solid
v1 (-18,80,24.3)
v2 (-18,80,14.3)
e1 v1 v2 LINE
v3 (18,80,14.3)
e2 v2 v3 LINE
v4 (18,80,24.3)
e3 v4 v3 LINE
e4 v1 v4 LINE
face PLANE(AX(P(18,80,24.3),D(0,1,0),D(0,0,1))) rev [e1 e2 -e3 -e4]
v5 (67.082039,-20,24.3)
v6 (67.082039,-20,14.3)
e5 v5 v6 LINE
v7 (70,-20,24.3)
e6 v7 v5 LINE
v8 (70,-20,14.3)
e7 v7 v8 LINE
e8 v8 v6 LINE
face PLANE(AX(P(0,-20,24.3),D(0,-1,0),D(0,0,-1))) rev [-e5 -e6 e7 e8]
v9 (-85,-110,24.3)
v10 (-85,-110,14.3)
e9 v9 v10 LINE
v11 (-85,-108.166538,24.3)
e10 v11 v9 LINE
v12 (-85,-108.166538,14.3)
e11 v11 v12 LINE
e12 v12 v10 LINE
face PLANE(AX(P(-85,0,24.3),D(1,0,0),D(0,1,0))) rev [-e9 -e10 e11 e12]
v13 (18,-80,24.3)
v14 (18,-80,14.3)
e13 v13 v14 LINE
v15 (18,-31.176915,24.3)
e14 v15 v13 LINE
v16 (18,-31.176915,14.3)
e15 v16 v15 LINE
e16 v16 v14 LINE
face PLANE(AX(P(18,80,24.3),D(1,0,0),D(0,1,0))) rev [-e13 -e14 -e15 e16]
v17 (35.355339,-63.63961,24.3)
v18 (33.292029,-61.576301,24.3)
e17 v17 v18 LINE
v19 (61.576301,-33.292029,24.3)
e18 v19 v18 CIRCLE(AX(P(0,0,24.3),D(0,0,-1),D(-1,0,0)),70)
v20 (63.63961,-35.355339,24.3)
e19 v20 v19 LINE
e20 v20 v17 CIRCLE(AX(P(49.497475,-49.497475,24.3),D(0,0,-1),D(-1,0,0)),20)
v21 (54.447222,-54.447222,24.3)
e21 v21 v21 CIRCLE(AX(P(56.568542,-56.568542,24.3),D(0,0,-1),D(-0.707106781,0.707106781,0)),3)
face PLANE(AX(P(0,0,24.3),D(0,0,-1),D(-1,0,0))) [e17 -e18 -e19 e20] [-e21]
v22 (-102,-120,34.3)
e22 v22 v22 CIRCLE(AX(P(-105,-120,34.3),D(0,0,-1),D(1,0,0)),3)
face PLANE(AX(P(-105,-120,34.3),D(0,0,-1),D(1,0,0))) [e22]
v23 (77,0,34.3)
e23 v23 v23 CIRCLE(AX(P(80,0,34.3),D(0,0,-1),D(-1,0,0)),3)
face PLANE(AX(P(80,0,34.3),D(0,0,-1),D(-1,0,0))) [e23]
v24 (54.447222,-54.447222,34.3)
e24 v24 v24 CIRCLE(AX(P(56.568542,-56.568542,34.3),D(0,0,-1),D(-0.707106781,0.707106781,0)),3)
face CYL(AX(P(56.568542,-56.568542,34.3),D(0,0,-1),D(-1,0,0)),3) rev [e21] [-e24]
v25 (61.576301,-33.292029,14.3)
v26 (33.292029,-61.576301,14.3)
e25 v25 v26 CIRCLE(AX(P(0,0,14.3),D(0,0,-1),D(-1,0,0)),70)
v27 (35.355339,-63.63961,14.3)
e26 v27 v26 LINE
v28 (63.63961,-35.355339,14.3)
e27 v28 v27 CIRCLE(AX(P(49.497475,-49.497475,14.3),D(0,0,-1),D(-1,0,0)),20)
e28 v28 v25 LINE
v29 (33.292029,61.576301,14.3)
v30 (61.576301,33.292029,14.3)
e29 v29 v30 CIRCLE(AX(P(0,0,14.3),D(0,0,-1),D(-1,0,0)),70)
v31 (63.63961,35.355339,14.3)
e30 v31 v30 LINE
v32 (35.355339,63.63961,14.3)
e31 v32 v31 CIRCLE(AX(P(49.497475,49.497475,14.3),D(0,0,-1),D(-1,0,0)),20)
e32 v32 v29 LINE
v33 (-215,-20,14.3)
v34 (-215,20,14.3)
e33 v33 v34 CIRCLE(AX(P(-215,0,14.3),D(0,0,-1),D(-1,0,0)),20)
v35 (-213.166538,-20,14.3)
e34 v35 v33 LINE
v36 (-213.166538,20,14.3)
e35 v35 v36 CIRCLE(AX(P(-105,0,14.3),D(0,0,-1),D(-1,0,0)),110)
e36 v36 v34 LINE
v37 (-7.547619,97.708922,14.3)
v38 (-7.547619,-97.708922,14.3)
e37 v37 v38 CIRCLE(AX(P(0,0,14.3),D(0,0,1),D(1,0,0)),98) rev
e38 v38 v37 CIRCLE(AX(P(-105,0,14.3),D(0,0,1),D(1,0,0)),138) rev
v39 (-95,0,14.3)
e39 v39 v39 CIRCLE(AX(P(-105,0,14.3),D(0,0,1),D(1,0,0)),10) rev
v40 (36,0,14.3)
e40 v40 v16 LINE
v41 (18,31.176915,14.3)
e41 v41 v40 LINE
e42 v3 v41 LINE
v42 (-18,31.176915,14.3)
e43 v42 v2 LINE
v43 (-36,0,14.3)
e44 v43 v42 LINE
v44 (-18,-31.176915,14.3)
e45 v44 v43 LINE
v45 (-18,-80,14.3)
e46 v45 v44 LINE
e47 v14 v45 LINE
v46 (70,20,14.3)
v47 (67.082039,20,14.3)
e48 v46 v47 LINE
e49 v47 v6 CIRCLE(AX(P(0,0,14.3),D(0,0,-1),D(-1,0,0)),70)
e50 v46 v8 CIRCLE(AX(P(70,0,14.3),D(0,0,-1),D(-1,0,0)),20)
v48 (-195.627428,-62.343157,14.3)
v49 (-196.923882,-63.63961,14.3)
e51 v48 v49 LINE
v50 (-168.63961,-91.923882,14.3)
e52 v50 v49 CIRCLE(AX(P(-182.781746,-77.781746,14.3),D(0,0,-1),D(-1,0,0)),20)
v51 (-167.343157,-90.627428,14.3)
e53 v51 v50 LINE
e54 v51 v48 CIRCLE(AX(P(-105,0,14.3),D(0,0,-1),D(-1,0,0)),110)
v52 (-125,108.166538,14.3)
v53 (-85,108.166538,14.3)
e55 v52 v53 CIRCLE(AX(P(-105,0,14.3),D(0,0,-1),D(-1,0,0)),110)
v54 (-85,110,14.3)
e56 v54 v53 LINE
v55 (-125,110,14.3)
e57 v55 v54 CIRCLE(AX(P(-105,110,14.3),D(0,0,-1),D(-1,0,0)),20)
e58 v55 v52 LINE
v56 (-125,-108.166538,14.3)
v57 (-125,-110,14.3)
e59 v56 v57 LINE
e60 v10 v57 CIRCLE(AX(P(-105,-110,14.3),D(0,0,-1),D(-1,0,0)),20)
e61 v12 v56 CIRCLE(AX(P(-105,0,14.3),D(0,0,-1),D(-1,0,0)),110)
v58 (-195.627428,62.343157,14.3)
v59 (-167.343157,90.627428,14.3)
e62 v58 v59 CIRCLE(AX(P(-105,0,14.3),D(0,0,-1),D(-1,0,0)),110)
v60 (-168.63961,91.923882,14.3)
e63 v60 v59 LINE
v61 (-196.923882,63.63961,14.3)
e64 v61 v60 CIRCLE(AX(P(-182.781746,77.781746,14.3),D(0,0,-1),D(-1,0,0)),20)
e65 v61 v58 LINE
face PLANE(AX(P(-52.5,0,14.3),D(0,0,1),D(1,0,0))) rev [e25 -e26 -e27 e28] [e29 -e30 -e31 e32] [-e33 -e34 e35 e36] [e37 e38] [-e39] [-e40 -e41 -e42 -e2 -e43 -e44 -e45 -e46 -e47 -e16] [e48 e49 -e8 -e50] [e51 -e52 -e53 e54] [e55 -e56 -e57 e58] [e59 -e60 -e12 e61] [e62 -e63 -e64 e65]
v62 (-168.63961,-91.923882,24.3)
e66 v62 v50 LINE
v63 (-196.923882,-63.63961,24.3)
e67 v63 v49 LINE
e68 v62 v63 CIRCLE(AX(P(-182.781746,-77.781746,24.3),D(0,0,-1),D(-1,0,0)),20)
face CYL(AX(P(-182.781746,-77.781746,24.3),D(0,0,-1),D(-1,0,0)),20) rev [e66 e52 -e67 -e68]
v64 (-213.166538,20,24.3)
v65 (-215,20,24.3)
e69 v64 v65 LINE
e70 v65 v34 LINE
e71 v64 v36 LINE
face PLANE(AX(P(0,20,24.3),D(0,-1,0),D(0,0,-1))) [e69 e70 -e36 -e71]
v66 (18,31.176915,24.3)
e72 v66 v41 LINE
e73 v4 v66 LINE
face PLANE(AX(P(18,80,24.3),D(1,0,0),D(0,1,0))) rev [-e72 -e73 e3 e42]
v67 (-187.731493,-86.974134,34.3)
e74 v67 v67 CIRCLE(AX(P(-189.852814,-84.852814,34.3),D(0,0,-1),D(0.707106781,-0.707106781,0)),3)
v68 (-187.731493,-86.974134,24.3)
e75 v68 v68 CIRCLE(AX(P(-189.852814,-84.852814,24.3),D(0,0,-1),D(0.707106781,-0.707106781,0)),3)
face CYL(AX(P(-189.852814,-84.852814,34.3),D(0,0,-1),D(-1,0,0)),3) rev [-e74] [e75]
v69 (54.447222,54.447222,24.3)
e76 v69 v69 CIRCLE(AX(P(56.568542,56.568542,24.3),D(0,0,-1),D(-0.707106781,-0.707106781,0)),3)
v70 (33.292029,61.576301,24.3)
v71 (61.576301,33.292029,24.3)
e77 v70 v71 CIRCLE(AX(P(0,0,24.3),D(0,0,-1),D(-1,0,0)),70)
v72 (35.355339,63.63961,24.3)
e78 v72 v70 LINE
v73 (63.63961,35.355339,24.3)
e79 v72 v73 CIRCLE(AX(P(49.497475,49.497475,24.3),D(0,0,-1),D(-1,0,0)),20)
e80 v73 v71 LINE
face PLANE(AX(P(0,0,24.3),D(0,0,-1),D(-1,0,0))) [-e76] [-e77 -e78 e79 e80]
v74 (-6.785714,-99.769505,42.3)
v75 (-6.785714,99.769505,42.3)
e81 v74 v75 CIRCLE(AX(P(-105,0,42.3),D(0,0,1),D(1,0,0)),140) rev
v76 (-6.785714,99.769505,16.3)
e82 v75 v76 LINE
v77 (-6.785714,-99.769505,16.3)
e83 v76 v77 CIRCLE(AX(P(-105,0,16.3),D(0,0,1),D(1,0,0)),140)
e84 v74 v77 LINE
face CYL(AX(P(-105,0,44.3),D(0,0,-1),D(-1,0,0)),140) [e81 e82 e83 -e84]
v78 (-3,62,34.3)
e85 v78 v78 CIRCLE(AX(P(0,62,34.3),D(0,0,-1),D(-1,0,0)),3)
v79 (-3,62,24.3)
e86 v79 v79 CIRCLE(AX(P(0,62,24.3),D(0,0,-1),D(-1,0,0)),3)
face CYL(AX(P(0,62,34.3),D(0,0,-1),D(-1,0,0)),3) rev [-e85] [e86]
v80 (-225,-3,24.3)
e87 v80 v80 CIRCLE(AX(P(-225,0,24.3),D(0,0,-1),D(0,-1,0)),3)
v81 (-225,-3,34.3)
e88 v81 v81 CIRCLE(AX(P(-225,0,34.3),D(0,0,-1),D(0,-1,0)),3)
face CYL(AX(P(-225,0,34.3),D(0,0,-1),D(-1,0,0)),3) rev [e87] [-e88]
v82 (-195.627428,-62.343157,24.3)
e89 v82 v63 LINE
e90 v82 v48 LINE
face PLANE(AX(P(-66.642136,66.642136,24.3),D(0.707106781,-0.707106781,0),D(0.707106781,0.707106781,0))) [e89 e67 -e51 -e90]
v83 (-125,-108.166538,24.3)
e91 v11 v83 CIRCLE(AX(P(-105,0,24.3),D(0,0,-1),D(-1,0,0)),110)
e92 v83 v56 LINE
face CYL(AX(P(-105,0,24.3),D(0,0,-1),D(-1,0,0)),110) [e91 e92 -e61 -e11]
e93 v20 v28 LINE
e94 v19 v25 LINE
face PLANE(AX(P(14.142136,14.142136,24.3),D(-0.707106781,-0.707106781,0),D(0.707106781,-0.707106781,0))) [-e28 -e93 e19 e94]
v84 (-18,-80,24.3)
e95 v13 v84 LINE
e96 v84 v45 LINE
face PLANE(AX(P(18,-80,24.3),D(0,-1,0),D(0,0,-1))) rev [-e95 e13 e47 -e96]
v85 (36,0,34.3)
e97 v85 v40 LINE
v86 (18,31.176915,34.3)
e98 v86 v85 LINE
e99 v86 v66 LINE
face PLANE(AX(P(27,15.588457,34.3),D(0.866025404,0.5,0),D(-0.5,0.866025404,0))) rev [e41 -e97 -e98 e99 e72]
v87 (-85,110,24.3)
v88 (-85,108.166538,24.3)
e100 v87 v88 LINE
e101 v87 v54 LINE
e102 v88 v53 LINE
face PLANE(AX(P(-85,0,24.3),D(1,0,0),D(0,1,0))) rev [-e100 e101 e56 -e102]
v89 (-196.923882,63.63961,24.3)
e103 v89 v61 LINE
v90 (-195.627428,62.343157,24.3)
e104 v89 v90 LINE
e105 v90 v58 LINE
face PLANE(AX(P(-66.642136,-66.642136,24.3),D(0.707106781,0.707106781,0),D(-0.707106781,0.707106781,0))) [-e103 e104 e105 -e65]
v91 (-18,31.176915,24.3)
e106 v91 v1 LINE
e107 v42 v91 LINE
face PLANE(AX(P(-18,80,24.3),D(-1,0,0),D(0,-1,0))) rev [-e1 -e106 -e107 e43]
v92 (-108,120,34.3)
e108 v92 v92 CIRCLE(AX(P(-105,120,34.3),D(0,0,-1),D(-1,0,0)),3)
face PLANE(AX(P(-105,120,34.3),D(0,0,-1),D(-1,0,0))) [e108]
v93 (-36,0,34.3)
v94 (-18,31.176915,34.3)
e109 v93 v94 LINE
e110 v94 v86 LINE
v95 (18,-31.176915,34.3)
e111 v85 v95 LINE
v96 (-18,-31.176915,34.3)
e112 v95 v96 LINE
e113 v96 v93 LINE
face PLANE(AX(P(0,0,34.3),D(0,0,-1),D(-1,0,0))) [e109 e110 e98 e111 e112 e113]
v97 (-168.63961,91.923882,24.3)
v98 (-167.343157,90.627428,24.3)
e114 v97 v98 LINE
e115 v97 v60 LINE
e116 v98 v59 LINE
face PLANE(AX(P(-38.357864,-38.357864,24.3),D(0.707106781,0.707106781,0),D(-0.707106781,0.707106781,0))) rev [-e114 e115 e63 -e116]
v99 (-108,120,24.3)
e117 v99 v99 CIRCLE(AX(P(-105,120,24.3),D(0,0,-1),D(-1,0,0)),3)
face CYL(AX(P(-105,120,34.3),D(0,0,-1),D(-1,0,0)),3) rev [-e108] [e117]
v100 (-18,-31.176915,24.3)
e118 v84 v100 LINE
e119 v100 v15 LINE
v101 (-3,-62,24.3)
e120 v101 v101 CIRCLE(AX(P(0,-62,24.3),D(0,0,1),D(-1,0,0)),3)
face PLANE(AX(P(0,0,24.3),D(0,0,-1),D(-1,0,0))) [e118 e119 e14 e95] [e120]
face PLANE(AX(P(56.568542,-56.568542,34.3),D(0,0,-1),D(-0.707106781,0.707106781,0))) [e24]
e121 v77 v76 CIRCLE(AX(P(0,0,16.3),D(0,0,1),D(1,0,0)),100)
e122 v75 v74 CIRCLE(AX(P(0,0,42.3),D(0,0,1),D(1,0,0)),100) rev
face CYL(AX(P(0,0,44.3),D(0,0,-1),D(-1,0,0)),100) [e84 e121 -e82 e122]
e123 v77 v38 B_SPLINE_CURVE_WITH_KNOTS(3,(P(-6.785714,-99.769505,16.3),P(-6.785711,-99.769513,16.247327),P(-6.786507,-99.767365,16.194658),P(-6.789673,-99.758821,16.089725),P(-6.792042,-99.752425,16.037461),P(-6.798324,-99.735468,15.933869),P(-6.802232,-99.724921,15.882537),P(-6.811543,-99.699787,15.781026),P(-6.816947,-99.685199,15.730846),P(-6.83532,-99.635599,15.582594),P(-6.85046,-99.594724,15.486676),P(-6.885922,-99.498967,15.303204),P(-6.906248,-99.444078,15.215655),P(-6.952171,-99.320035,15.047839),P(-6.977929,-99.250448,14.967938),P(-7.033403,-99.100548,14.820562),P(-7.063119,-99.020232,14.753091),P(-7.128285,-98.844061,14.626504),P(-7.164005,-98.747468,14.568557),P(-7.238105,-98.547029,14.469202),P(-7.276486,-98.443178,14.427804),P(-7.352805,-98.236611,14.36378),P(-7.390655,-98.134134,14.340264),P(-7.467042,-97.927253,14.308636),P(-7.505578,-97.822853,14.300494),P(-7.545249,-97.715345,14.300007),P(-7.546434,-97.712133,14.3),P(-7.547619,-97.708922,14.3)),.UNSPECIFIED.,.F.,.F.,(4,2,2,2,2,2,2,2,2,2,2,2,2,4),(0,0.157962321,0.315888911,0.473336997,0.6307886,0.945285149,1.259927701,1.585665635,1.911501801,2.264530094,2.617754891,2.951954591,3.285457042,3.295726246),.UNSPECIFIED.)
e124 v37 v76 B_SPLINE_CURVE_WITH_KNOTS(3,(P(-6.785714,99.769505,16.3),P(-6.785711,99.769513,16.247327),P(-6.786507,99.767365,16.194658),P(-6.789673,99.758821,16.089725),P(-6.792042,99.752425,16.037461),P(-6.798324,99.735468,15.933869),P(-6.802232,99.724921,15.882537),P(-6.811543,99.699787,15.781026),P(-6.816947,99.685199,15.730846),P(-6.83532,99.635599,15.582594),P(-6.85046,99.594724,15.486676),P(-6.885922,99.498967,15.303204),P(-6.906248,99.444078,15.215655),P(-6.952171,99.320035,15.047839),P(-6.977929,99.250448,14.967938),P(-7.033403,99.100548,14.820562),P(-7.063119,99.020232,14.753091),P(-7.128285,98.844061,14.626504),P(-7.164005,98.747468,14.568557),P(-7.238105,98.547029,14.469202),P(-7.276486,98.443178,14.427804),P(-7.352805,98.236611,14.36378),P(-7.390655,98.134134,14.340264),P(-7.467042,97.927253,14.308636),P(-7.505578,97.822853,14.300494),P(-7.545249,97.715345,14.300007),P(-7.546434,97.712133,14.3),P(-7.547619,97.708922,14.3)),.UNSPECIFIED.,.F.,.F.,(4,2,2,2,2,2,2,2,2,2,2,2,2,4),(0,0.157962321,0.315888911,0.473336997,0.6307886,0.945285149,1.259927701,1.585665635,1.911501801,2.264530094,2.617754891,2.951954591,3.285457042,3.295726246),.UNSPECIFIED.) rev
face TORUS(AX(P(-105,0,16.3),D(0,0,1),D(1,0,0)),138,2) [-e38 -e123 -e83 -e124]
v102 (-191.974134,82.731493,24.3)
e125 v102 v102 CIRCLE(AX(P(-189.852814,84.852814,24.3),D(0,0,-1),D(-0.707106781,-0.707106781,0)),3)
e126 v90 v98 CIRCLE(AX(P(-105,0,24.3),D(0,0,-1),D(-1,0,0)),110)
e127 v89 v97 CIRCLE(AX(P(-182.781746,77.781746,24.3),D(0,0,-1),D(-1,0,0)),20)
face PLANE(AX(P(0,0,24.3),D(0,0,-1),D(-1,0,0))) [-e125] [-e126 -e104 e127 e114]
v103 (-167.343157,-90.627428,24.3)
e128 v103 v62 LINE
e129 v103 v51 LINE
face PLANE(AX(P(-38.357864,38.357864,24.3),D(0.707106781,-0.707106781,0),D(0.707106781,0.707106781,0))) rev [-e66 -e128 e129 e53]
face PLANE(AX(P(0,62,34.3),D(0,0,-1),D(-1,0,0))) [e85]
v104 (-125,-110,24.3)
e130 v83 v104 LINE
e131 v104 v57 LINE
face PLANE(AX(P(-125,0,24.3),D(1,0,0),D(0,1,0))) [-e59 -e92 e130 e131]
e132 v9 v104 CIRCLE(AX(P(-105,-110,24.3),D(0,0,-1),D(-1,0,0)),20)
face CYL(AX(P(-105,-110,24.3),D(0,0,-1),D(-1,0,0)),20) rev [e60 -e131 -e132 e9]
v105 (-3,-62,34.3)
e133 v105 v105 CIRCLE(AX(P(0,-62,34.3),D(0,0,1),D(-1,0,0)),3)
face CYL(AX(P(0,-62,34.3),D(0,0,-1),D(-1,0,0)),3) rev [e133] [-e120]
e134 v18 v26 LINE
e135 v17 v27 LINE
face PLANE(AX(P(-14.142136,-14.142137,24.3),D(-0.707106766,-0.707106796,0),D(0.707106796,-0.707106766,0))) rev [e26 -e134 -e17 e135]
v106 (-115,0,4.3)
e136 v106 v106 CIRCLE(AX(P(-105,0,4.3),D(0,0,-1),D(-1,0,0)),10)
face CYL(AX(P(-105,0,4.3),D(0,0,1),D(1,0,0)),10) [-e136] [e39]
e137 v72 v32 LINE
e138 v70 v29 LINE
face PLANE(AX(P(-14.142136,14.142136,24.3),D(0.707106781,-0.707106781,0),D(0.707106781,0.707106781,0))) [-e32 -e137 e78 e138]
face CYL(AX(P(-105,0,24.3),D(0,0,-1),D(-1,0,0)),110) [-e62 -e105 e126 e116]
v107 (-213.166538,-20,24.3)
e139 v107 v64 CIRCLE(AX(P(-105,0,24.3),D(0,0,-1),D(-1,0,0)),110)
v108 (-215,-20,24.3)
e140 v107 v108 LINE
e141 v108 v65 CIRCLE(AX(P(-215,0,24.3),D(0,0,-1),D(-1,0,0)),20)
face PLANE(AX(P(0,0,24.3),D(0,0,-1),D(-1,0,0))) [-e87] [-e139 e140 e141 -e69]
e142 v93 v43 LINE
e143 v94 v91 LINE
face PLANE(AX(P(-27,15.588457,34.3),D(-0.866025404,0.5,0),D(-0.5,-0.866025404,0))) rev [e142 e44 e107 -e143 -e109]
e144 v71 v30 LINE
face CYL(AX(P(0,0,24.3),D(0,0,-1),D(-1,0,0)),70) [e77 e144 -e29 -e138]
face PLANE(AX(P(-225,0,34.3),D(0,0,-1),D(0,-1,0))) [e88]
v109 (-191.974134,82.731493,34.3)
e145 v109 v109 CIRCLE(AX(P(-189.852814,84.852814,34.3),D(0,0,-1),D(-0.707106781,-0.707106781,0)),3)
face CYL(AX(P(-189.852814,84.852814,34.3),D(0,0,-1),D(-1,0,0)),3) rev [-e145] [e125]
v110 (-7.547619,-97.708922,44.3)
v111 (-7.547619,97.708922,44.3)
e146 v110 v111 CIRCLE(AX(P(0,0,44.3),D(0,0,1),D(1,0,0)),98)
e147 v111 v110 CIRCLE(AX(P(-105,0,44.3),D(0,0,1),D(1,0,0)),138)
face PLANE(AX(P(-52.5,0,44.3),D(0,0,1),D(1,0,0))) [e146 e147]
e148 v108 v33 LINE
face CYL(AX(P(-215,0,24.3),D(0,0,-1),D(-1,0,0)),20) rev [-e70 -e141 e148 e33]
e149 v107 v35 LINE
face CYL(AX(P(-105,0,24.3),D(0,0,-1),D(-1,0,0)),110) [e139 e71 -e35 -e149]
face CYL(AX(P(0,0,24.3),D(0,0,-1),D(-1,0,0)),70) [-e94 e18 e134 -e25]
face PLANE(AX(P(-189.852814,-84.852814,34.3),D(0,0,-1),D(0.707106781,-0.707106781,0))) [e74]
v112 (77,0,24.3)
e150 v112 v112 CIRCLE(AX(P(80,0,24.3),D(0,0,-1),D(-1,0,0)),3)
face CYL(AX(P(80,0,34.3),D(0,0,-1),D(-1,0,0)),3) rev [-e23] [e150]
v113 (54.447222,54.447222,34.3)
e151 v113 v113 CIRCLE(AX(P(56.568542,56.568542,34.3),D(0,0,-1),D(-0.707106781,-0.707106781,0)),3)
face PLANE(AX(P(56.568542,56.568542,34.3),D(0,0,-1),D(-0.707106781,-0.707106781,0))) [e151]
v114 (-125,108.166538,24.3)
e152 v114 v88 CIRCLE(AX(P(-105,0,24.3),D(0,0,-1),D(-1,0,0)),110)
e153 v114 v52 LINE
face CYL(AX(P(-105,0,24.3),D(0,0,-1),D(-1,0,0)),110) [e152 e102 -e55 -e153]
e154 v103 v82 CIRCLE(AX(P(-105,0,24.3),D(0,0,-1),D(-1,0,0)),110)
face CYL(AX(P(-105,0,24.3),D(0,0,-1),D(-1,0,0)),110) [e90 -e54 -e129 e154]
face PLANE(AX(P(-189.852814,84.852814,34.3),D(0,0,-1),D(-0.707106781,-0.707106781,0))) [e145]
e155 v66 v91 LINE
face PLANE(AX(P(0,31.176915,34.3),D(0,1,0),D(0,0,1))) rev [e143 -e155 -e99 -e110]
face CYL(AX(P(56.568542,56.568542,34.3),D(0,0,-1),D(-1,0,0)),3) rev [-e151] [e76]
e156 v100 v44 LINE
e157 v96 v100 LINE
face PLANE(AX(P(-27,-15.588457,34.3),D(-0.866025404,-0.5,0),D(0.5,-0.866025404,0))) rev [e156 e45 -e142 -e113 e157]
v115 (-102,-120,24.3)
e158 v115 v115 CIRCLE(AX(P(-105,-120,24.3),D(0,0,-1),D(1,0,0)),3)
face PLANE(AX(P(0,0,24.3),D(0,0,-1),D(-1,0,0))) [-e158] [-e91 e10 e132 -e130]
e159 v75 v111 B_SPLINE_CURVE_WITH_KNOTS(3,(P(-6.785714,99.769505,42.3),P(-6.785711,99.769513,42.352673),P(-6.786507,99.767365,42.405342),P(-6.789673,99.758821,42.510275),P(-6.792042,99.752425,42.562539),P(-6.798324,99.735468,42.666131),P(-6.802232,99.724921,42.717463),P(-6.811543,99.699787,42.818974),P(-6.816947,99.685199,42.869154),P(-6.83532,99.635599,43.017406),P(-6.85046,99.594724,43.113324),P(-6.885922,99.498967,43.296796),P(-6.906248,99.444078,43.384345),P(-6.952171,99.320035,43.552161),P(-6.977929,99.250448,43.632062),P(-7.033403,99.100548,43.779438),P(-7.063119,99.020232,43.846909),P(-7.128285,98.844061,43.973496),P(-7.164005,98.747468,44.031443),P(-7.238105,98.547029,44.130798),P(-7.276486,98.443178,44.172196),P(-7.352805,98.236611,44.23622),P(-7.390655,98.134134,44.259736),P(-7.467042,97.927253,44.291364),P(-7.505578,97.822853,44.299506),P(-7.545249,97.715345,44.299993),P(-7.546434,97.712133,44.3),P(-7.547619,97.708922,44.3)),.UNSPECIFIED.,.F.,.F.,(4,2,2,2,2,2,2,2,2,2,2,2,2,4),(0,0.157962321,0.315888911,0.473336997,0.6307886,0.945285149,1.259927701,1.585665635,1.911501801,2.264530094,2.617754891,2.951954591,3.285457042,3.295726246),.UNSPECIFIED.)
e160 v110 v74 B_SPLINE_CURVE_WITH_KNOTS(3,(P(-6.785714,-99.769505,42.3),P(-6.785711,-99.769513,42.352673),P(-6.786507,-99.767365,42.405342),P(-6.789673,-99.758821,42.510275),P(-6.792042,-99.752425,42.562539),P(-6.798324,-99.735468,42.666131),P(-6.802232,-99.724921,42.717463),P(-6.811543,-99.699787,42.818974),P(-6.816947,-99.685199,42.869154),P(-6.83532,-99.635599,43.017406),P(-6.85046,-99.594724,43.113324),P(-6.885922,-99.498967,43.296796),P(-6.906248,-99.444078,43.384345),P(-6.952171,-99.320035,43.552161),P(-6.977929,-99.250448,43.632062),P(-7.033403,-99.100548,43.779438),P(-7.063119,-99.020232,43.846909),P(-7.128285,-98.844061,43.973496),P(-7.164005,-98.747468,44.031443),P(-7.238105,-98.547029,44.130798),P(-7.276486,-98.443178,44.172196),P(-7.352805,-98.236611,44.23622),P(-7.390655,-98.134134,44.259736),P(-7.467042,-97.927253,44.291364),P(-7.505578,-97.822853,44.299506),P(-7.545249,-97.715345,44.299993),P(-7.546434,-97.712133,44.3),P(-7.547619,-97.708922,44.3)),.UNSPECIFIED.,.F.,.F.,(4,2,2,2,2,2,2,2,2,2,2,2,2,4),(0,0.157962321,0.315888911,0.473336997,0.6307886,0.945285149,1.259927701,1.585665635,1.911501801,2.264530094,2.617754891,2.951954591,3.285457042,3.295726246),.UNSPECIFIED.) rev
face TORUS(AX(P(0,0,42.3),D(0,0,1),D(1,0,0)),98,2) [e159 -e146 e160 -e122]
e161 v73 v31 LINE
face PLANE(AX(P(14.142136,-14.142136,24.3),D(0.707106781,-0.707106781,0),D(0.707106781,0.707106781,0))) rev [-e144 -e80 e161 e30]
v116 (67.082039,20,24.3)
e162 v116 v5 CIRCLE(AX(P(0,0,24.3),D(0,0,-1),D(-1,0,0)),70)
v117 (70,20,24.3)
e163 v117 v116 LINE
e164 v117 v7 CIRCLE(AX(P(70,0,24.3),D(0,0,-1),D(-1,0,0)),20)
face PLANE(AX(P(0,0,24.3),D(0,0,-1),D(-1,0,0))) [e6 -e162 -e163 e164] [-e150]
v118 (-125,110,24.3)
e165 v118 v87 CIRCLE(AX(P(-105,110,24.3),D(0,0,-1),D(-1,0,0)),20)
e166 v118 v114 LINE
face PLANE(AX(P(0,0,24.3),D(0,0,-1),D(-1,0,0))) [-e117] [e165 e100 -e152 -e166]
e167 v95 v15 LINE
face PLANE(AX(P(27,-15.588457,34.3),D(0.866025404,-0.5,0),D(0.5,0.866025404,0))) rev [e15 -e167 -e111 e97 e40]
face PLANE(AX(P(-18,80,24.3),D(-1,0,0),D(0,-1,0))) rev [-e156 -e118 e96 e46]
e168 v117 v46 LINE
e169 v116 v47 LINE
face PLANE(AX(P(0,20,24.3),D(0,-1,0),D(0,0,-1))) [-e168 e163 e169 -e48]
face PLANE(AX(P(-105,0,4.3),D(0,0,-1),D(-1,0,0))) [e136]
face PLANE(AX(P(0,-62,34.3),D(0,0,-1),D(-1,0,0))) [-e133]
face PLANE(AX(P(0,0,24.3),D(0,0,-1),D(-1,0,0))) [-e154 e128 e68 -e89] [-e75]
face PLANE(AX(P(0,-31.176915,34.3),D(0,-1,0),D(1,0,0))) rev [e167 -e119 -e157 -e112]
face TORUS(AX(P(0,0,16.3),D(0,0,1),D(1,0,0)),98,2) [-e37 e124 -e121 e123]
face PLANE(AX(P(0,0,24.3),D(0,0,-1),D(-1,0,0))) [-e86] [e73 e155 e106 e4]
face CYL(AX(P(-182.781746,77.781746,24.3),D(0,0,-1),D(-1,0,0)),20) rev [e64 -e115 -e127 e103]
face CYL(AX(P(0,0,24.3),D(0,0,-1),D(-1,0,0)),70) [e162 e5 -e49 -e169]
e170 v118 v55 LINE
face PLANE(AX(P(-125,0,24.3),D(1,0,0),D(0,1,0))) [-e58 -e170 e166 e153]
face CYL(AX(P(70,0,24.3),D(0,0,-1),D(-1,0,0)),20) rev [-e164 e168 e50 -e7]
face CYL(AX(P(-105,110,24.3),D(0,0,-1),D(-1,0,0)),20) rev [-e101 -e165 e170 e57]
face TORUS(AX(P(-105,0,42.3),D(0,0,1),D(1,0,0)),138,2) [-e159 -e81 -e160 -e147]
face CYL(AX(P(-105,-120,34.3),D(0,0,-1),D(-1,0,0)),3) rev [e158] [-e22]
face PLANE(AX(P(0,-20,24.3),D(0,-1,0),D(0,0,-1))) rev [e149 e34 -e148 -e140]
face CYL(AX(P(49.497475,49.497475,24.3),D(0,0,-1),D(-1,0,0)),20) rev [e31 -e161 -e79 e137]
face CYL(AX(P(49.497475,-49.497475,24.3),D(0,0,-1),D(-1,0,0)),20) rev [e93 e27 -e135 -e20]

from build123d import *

# Parameters (mm, degrees)
SKETCH_1_R               = 1.75
EXTRUDE_1_DEPTH          = 6.6
EXTRUDE_1_2_DEPTH        = 6.6
SKETCH_2_R               = 50
EXTRUDE_2_DEPTH          = 3.4
SKETCH_4_R               = 1.75
CUT_EXTRUDE_2_DEPTH      = 10
SKETCH_5_R               = 36
EXTRUDE_3_DEPTH          = 4.3
EXTRUDE_4_DEPTH          = 30
SKETCH_9_R               = 10
EXTRUDE_6_DEPTH          = 10
SKETCH_10_R              = 50
CUT_EXTRUDE_4_DEPTH      = 14.3
CUT_EXTRUDE_7_DEPTH      = 20
SKETCH_13_W              = 36
SKETCH_13_H              = 160
CUT_EXTRUDE_8_DEPTH      = 10
SKETCH_14_R              = 3
CUT_EXTRUDE_9_DEPTH      = 10
CUT_EXTRUDE_START        = -10
CUT_EXTRUDE_10_DEPTH     = 10
SKETCH_16_R              = 3
CUT_EXTRUDE_11_DEPTH     = 10
PATTERN_CIRCULAR_1_COUNT = 5
PATTERN_CIRCULAR_1_ANGLE = 180
SKETCH_17_R              = 3
CUT_EXTRUDE_12_DEPTH     = 10
PATTERN_CIRCULAR_2_COUNT = 2
PATTERN_CIRCULAR_2_ANGLE = 45
PATTERN_CIRCULAR_3_COUNT = 2
PATTERN_CIRCULAR_3_ANGLE = 45
FILLET_1_R               = 2


# Read off the part's stored shape, not the designer's step: 切除-拉伸10
with BuildPart() as part:
    # 草图1 → 凸台-拉伸1 (new body)
    with BuildSketch(Plane.XY):
        with BuildLine():
            ThreePointArc((20.506096654, 20.506096654), (29, 0), (20.506096654, -20.506096654))
            Line((20.506096654, -20.506096654), (24.748737342, -24.748737342))
            ThreePointArc((24.748737342, -24.748737342), (24.748737342, -35.355339059), (35.355339059, -35.355339059))
            ThreePointArc((35.355339059, -35.355339059), (50, 0), (35.355339059, 35.355339059))
            ThreePointArc((35.355339059, 35.355339059), (24.748737342, 35.355339059), (24.748737342, 24.748737342))
            Line((24.748737342, 24.748737342), (20.506096654, 20.506096654))
        make_face()
        with Locations((30.0520382, 30.0520382)):
            Circle(SKETCH_1_R, mode=Mode.SUBTRACT)
        with Locations((30.0520382, -30.0520382)):
            Circle(SKETCH_1_R, mode=Mode.SUBTRACT)
        with Locations((42.5, 0)):
            Circle(SKETCH_1_R, mode=Mode.SUBTRACT)
    extrude(amount=EXTRUDE_1_DEPTH)



with BuildPart() as body_2:
    # 草图1 → Extrude 1 2 (new body)
    with BuildSketch(Plane.XY):
        with BuildLine():
            ThreePointArc((-35.355339059, 35.355339059), (-50, 0), (-35.355339059, -35.355339059))
            ThreePointArc((-35.355339059, -35.355339059), (-24.748737342, -35.355339059), (-24.748737342, -24.748737342))
            Line((-24.748737342, -24.748737342), (-20.506096654, -20.506096654))
            ThreePointArc((-20.506096654, -20.506096654), (-29, 0), (-20.506096654, 20.506096654))
            Line((-20.506096654, 20.506096654), (-24.748737342, 24.748737342))
            ThreePointArc((-24.748737342, 24.748737342), (-24.748737342, 35.355339059), (-35.355339059, 35.355339059))
        make_face()
        with Locations((-30.0520382, 30.0520382)):
            Circle(SKETCH_1_R, mode=Mode.SUBTRACT)
        with Locations((-30.0520382, -30.0520382)):
            Circle(SKETCH_1_R, mode=Mode.SUBTRACT)
        with Locations((-42.5, 0)):
            Circle(SKETCH_1_R, mode=Mode.SUBTRACT)
    extrude(amount=EXTRUDE_1_2_DEPTH)


with BuildPart() as part_1:
    add(part.part)

    add(body_2.part)  # 凸台-拉伸2 merges body 2
    # 草图2 → 凸台-拉伸2 (add)
    with BuildSketch(Plane.XY.offset(6.6)):
        with Locations(Location((0, 0, 0), (0, 0, 225))):
            Circle(SKETCH_2_R)
    extrude(amount=EXTRUDE_2_DEPTH)

    # 草图4 → 切除-拉伸2 (cut, symmetric)
    with BuildSketch(Plane(origin=(0, 0, 6.6), x_dir=(-1, 0, 0), z_dir=(0, 0, -1))):
        with Locations(Location((-42.5, 0, 0), (0, 0, 180))):
            Circle(SKETCH_4_R)
        with Locations(Location((-30.0520382, 30.0520382, 0), (0, 0, 180))):
            Circle(SKETCH_4_R)
        with Locations(Location((-30.0520382, -30.0520382, 0), (0, 0, 180))):
            Circle(SKETCH_4_R)
        with Locations(Location((30.0520382, -30.0520382, 0), (0, 0, 180))):
            Circle(SKETCH_4_R)
        with Locations(Location((42.5, 0, 0), (0, 0, 180))):
            Circle(SKETCH_4_R)
        with Locations(Location((30.0520382, 30.0520382, 0), (0, 0, 180))):
            Circle(SKETCH_4_R)
    extrude(amount=CUT_EXTRUDE_2_DEPTH, both=True, mode=Mode.SUBTRACT)

    # 草图5 → 凸台-拉伸3 (add)
    with BuildSketch(Plane.XY.offset(10)):
        with Locations(Location((0, 0, 0), (0, 0, 180))):
            Circle(SKETCH_5_R)
    extrude(amount=EXTRUDE_3_DEPTH)

    # 草图8 → 凸台-拉伸4 (add)
    with BuildSketch(Plane.XY.offset(14.3)):
        with BuildLine():
            ThreePointArc((-6.785714286, -99.769504768), (100, 0), (-6.785714286, 99.769504768))
            ThreePointArc((-6.785714286, 99.769504768), (-245, 0), (-6.785714286, -99.769504768))
        make_face()
    extrude(amount=EXTRUDE_4_DEPTH)

    # 草图9 → 凸台-拉伸6 (add)
    with BuildSketch(Plane(origin=(0, 0, 14.3), x_dir=(-1, 0, 0), z_dir=(0, 0, -1))):
        with Locations(Location((105, 0, 0), (0, 0, 180))):
            Circle(SKETCH_9_R)
    extrude(amount=EXTRUDE_6_DEPTH)

    # 草图10 → 切除-拉伸4 (cut)
    with BuildSketch(Plane(origin=(0, 0, 0), x_dir=(-1, 0, 0), z_dir=(0, 0, -1))):
        Circle(SKETCH_10_R)
    extrude(amount=-CUT_EXTRUDE_4_DEPTH, mode=Mode.SUBTRACT)

    # 草图11 → 切除-拉伸7 (cut)
    with BuildSketch(Plane(origin=(0, 0, 14.3), x_dir=(-1, 0, 0), z_dir=(0, 0, -1))):
        Polygon((-18, -31.176914536), (18, -31.176914536), (36, 0), (18, 31.176914536), (-18, 31.176914536), (-36, 0), align=None)
    extrude(amount=-CUT_EXTRUDE_7_DEPTH, mode=Mode.SUBTRACT)

    # 草图13 → 切除-拉伸8 (cut)
    with BuildSketch(Plane(origin=(0, 0, 14.3), x_dir=(-1, 0, 0), z_dir=(0, 0, -1))):
        Rectangle(SKETCH_13_W, SKETCH_13_H)
    extrude(amount=-CUT_EXTRUDE_8_DEPTH, mode=Mode.SUBTRACT)

    # 草图14 → 切除-拉伸9 (cut)
    with BuildSketch(Plane(origin=(0, 0, 24.3), x_dir=(-1, 0, 0), z_dir=(0, 0, -1))):
        with Locations((0, 62)):
            Circle(SKETCH_14_R)
    cut_extrude_9 = extrude(amount=-CUT_EXTRUDE_9_DEPTH, mode=Mode.SUBTRACT)

    # 镜向1: 切除-拉伸9 across plane
    add(cut_extrude_9.mirror(Plane.ZX), mode=Mode.SUBTRACT)

    # 切除-拉伸10 outline → 切除-拉伸10 (cut)
    with BuildSketch(Plane(origin=(0, 0, 14.3), x_dir=(-1, 0, 0), z_dir=(0, 0, -1)).offset(CUT_EXTRUDE_START)):
        with BuildLine():
            ThreePointArc((213.166538264, 20), (215, 0), (213.166538264, -20.000000001))
            Line((213.166538264, -20.000000001), (215, -20))
            ThreePointArc((215, -20), (235.000000001, 0), (215, 20))
            Line((215, 20), (213.166538264, 20))
        make_face()
        with BuildLine():
            ThreePointArc((167.343157078, 90.627428329), (182.78174593, 77.781745931), (195.627428329, 62.343157079))
            Line((195.627428329, 62.343157079), (196.923881561, 63.63961031))
            ThreePointArc((196.923881561, 63.63961031), (196.923881554, 91.923881558), (168.639610306, 91.923881556))
            Line((168.639610306, 91.923881556), (167.343157078, 90.627428329))
        make_face()
        with BuildLine():
            ThreePointArc((195.627428318, -62.343157094), (182.781745927, -77.781745934), (167.343157087, -90.627428323))
            Line((167.343157087, -90.627428323), (168.639610312, -91.923881548))
            ThreePointArc((168.639610312, -91.923881548), (196.923881525, -91.923881572), (196.923881594, -63.639610359))
            Line((196.923881594, -63.639610359), (195.627428318, -62.343157094))
        make_face()
        with BuildLine():
            ThreePointArc((124.999999989, -108.166538266), (104.999999986, -110), (84.999999984, -108.166538261))
            Line((84.999999984, -108.166538261), (84.999999984, -109.999999998))
            ThreePointArc((84.999999984, -109.999999998), (104.999999924, -130.000000016), (125.000000016, -110.00000015))
            Line((125.000000016, -110.00000015), (124.999999989, -108.166538266))
        make_face()
        with BuildLine():
            ThreePointArc((85.00000001, 108.166538266), (105.000000014, 110), (125.000000017, 108.166538261))
            Line((125.000000017, 108.166538261), (124.999999989, 109.99999985))
            ThreePointArc((124.999999989, 109.99999985), (105.000000076, 129.999999989), (85.000000011, 110.000000002))
            Line((85.000000011, 110.000000002), (85.00000001, 108.166538266))
        make_face()
        with BuildLine():
            Line((-67.082039323, 20), (-70, 20))
            ThreePointArc((-70, 20), (-90, 0), (-70, -20))
            Line((-70, -20), (-67.082039323, -20))
            ThreePointArc((-67.082039323, -20), (-69.999999998, 0), (-67.082039323, 20))
        make_face()
        with BuildLine():
            ThreePointArc((-33.292029197, -61.576300568), (-49.497474649, -49.497474714), (-61.576300524, -33.292029278))
            Line((-61.576300524, -33.292029278), (-63.639610307, -35.355339059))
            ThreePointArc((-63.639610307, -35.355339059), (-63.6396103, -63.639610325), (-35.355339034, -63.639610318))
            Line((-35.355339034, -63.639610318), (-33.292029197, -61.576300568))
        make_face()
        with BuildLine():
            ThreePointArc((-61.576300517, 33.292029292), (-49.497474678, 49.497474685), (-33.292029283, 61.576300521))
            Line((-33.292029283, 61.576300521), (-35.355339063, 63.639610301))
            ThreePointArc((-35.355339063, 63.639610301), (-63.639610303, 63.639610311), (-63.639610293, 35.35533907))
            Line((-63.639610293, 35.35533907), (-61.576300517, 33.292029292))
        make_face()
    extrude(amount=CUT_EXTRUDE_10_DEPTH, mode=Mode.SUBTRACT)

    # 草图16 → 切除-拉伸11 (cut)
    with BuildSketch(Plane(origin=(0, 0, 24.3), x_dir=(-1, 0, 0), z_dir=(0, 0, -1))):
        with Locations((104.999999997, 119.999999989)):
            Circle(SKETCH_16_R)
    cut_extrude_11 = extrude(amount=-CUT_EXTRUDE_11_DEPTH, mode=Mode.SUBTRACT)

    # 阵列(圆周)1: 切除-拉伸11 ×5 about axis
    pattern_circular_1_axis = Axis((-105, 0, 0), (0, 0, 1))
    for i in range(1, PATTERN_CIRCULAR_1_COUNT):
        add(cut_extrude_11.rotate(pattern_circular_1_axis, i * PATTERN_CIRCULAR_1_ANGLE / (PATTERN_CIRCULAR_1_COUNT - 1)), mode=Mode.SUBTRACT)

    # 草图17 → 切除-拉伸12 (cut)
    with BuildSketch(Plane(origin=(0, 0, 24.3), x_dir=(-1, 0, 0), z_dir=(0, 0, -1))):
        with Locations((-80, 0)):
            Circle(SKETCH_17_R)
    cut_extrude_12 = extrude(amount=-CUT_EXTRUDE_12_DEPTH, mode=Mode.SUBTRACT)

    # 阵列(圆周)2: 切除-拉伸12 ×2 about axis
    pattern_circular_2_axis = Axis((0, 0, 34.3), (0, 0, 1))
    for i in range(1, PATTERN_CIRCULAR_2_COUNT):
        add(cut_extrude_12.rotate(pattern_circular_2_axis, i * PATTERN_CIRCULAR_2_ANGLE / (PATTERN_CIRCULAR_2_COUNT - 1)), mode=Mode.SUBTRACT)

    # 阵列(圆周)3: 切除-拉伸12 ×2 about axis
    pattern_circular_3_axis = Axis((0, 0, 34.3), (0, 0, -1))
    for i in range(1, PATTERN_CIRCULAR_3_COUNT):
        add(cut_extrude_12.rotate(pattern_circular_3_axis, i * PATTERN_CIRCULAR_3_ANGLE / (PATTERN_CIRCULAR_3_COUNT - 1)), mode=Mode.SUBTRACT)

    # 圆角1
    fillet_1_edges = [part_1.edges().sort_by_distance(p)[0] for p in [
        (-245, 0, 14.3),
        (100, 0, 14.3),
        (-245, 0, 44.3),
        (100, 0, 44.3),
    ]]
    fillet(fillet_1_edges, radius=FILLET_1_R)


solid = part_1.part
